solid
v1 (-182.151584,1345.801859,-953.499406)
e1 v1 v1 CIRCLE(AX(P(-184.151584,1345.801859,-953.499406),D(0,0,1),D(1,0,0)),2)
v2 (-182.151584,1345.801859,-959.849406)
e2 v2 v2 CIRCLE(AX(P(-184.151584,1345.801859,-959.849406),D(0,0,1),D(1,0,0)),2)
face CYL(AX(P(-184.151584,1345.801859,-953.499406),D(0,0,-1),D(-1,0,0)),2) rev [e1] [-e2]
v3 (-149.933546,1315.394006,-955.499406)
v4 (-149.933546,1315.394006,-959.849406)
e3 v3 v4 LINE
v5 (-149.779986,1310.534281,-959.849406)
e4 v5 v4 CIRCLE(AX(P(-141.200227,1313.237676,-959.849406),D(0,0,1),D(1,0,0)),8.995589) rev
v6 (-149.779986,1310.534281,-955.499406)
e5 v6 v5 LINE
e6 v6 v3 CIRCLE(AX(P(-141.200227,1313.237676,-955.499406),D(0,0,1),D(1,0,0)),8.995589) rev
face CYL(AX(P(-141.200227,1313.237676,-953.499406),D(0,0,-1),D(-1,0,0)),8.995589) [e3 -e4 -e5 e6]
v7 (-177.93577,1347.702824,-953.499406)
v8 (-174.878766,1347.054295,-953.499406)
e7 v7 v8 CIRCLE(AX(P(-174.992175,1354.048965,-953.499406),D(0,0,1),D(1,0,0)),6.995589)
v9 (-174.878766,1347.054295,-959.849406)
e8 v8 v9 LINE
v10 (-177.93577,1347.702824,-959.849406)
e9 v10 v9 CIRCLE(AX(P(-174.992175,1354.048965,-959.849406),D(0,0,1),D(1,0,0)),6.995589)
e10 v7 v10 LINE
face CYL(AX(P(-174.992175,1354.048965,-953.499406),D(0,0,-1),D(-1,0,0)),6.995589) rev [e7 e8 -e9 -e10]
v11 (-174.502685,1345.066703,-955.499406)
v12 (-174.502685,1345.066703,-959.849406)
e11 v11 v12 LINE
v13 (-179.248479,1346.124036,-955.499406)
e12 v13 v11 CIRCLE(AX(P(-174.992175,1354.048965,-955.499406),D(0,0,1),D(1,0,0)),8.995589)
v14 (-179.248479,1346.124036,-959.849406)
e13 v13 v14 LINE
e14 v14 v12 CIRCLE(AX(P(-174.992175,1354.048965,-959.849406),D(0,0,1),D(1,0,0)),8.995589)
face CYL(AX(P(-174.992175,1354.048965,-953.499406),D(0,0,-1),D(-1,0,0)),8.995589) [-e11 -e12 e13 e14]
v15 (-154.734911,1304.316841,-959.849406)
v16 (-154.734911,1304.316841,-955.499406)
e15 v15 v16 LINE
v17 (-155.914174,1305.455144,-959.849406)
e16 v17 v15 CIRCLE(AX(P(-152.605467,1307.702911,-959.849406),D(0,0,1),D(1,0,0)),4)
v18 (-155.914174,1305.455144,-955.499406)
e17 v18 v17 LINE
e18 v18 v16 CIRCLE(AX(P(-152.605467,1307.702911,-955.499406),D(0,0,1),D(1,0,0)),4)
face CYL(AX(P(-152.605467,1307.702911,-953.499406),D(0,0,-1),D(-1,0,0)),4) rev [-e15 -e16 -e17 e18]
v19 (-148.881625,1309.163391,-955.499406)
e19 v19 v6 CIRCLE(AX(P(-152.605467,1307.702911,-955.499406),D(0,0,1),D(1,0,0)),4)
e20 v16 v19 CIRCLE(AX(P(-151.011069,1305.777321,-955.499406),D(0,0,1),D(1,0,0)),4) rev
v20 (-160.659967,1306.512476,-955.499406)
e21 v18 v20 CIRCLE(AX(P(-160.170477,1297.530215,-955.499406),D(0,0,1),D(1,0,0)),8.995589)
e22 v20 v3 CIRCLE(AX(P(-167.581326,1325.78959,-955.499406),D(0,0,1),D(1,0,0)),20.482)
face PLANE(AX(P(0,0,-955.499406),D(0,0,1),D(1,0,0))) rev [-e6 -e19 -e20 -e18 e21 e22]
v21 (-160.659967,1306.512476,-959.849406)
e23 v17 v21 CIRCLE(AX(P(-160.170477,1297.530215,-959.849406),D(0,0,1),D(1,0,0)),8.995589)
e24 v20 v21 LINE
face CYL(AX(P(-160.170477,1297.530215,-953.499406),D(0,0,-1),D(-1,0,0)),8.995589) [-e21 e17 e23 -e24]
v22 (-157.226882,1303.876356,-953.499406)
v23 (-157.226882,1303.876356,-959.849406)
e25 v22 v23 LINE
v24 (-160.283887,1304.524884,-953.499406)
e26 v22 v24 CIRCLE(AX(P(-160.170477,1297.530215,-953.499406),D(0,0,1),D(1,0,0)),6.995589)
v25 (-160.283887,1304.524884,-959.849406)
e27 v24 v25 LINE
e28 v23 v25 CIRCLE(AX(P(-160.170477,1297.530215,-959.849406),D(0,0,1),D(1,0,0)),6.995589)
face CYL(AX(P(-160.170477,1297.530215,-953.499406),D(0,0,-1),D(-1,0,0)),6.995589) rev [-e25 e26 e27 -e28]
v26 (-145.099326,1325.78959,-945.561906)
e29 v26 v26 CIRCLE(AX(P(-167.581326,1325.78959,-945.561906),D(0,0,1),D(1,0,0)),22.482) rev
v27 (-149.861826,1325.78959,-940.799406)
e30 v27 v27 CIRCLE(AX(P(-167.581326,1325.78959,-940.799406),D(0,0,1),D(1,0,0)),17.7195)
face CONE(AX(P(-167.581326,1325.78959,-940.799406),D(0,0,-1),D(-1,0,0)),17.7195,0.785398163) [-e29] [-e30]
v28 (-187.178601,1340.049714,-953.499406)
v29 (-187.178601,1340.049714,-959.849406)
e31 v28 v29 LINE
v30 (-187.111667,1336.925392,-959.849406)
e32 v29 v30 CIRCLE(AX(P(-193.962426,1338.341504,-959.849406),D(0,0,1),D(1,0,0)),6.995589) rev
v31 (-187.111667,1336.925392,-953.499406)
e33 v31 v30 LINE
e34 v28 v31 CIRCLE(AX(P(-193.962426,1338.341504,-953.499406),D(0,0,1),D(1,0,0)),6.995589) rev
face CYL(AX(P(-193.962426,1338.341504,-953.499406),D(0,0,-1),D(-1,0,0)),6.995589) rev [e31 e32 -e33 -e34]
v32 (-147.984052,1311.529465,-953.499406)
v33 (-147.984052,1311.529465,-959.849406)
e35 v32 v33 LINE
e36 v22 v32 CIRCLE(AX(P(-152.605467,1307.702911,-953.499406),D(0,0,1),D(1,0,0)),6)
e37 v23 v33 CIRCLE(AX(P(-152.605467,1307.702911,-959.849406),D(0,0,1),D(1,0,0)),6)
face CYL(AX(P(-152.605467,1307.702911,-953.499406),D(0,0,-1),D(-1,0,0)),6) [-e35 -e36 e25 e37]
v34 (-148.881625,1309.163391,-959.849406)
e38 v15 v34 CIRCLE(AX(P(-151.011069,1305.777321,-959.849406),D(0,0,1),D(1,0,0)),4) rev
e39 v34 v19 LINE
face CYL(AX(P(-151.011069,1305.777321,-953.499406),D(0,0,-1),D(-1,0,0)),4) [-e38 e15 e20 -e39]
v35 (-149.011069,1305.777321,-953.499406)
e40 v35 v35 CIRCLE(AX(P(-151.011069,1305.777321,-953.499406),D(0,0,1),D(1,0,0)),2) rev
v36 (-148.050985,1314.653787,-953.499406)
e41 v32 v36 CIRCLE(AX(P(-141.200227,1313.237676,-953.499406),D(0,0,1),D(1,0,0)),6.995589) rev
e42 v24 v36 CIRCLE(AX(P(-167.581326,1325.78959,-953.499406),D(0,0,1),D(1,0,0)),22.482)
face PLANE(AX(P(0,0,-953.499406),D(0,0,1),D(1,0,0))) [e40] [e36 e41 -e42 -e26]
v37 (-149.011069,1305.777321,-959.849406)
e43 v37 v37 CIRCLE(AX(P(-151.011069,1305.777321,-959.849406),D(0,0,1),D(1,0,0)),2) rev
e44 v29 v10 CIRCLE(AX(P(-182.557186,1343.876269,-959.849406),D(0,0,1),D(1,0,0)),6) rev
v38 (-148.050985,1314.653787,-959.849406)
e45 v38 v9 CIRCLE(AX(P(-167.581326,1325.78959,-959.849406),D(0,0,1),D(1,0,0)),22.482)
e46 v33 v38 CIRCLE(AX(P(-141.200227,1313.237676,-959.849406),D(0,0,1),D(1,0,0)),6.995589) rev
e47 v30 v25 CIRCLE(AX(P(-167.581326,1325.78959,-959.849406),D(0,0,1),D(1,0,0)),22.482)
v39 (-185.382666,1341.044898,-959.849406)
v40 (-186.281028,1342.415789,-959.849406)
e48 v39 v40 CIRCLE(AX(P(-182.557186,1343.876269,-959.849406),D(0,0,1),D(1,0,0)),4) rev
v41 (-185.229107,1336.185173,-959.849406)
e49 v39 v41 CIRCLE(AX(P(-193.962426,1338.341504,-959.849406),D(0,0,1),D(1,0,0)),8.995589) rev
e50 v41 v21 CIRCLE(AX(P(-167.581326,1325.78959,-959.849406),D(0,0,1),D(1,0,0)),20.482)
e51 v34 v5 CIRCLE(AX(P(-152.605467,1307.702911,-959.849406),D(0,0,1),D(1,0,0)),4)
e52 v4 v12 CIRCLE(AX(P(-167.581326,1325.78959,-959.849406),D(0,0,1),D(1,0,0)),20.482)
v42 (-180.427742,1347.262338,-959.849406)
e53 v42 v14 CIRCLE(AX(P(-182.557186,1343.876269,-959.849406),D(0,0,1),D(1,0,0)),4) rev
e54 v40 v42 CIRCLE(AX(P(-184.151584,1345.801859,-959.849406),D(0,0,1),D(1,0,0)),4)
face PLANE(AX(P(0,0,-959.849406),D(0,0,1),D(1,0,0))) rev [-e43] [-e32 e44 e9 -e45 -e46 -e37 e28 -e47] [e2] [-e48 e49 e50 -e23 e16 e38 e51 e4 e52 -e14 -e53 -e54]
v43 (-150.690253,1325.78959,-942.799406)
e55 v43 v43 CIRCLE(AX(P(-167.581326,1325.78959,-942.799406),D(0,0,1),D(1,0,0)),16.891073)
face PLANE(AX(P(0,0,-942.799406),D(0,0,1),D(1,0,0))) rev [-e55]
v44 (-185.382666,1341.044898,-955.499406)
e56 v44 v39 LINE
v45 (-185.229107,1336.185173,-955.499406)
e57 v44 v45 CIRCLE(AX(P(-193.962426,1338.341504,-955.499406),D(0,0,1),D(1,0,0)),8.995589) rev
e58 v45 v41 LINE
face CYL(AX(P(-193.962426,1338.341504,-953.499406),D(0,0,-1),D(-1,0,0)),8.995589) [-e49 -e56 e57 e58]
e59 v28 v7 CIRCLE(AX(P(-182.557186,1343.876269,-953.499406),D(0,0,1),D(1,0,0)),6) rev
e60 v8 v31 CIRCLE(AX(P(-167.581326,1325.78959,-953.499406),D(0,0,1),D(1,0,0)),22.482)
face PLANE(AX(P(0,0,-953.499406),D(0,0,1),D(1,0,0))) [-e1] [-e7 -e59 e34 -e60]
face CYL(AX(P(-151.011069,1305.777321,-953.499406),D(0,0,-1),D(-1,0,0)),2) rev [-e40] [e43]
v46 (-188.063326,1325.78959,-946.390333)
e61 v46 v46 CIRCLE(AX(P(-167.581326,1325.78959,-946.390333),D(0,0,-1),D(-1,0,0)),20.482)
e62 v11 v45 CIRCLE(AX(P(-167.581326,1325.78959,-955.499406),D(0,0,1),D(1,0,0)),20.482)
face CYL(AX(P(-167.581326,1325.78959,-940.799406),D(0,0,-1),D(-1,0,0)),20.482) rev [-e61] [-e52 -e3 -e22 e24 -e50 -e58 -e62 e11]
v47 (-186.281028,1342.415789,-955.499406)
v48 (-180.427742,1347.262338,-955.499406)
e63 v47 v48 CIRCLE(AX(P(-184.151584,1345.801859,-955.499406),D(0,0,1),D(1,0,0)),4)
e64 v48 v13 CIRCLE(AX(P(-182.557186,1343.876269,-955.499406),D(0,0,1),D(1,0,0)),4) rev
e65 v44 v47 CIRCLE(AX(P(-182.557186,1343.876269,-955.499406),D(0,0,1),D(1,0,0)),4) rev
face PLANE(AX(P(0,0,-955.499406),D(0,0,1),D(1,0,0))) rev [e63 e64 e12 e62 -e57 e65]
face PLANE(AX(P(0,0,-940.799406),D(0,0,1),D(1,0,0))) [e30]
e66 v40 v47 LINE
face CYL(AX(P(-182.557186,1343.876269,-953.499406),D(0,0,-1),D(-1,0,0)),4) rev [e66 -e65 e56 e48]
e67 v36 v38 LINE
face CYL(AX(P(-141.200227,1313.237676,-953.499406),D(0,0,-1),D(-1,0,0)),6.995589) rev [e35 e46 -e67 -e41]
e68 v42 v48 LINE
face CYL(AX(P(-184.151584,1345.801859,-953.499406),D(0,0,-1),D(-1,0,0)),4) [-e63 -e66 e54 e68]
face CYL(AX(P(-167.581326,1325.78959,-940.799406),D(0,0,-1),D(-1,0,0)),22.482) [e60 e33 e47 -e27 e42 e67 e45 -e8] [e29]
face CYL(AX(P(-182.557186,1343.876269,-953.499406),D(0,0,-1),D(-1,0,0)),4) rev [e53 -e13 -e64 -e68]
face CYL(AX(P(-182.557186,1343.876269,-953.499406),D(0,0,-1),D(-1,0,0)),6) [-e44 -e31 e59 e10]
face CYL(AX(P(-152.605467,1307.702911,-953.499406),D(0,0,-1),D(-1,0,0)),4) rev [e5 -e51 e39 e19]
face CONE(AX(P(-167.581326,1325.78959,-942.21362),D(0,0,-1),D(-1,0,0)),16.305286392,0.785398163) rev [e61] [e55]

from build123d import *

# Parameters (mm, degrees)
SKETCH1_R           = 22.482
SKETCH1_R_2         = 19.45
SKETCH1_R_3         = 5
SKETCH1_R_4         = 2.8
BOSS_EXTRUDE1_DEPTH = 19.05
SKETCH1_5_R         = 2
BOSS_EXTRUDE3_DEPTH = 6.35
CHAMFER1_SIZE       = 4.7625
SHELL1_START        = -959.849406281
SHELL1_OUTLINE_R    = 20.481999936
SHELL1_DEPTH        = 13.459072749
SHELL1_2_DEPTH      = 4.349999936


with BuildPart() as part:
    # Sketch1 → Boss-Extrude1 (new body)
    # profile 1 of 6: a face of its own
    with BuildSketch(Plane.XY.offset(-959.849406281)):
        with Locations(Location((-167.581326331, 1325.789589838, 0), (0, 0, 180))):
            Circle(SKETCH1_R)
        with Locations((-167.581326331, 1325.789589838)):
            Circle(SKETCH1_R_2, mode=Mode.SUBTRACT)
    # profile 2 of 6: a face of its own
    with BuildSketch(Plane.XY.offset(-959.849406281)):
        with Locations((-167.581326331, 1325.789589838)):
            Circle(SKETCH1_R_2)
        with Locations((-158.719406684, 1324.967166478)):
            Circle(SKETCH1_R_3, mode=Mode.SUBTRACT)
        with Locations((-176.443245977, 1326.612013197)):
            Circle(SKETCH1_R_3, mode=Mode.SUBTRACT)
        with Locations((-168.704072827, 1313.691575939)):
            Circle(SKETCH1_R_4, mode=Mode.SUBTRACT)
        Polygon((-169.416951474, 1318.076211503), (-167.966159705, 1333.709036048), (-165.745701187, 1333.502968172), (-167.196492956, 1317.870143628), align=None, mode=Mode.SUBTRACT)
    # profile 3 of 6: a face of its own
    with BuildSketch(Plane.XY.offset(-959.849406281)):
        with Locations((-168.704072827, 1313.691575939)):
            Circle(SKETCH1_R_4)
    # profile 4 of 6: a face of its own
    with BuildSketch(Plane.XY.offset(-959.849406281)):
        with Locations((-158.719406684, 1324.967166478)):
            Circle(SKETCH1_R_3)
    # profile 5 of 6: a face of its own
    with BuildSketch(Plane.XY.offset(-959.849406281)):
        Polygon((-167.966159705, 1333.709036048), (-165.745701187, 1333.502968172), (-167.196492956, 1317.870143628), (-169.416951474, 1318.076211503), align=None)
    # profile 6 of 6: a face of its own
    with BuildSketch(Plane.XY.offset(-959.849406281)):
        with Locations((-176.443245977, 1326.612013197)):
            Circle(SKETCH1_R_3)
    extrude(amount=BOSS_EXTRUDE1_DEPTH)

    # Sketch1<5> → Boss-Extrude3 (add)
    # profile 1 of 2: a face of its own
    with BuildSketch(Plane.XY.offset(-959.849406281)):
        with BuildLine():
            ThreePointArc((-187.111667422, 1336.925392497), (-181.91942666, 1343.106032976), (-174.878765823, 1347.054295358))
            ThreePointArc((-174.878765823, 1347.054295358), (-176.443944893, 1347.205674138), (-177.935770468, 1347.702823524))
            ThreePointArc((-177.935770468, 1347.702823524), (-186.383740435, 1348.497684162), (-187.178601073, 1340.049714195))
            ThreePointArc((-187.178601073, 1340.049714195), (-186.968441908, 1338.4913387), (-187.111667422, 1336.925392497))
        make_face()
        with Locations((-184.151583548, 1345.801858569)):
            Circle(SKETCH1_5_R, mode=Mode.SUBTRACT)
    # profile 2 of 2: a face of its own
    with BuildSketch(Plane.XY.offset(-959.849406281)):
        with BuildLine():
            ThreePointArc((-147.984051588, 1311.529465481), (-148.194210754, 1313.087840976), (-148.050985239, 1314.653787179))
            ThreePointArc((-148.050985239, 1314.653787179), (-153.243226001, 1308.4731467), (-160.283886838, 1304.524884318))
            ThreePointArc((-160.283886838, 1304.524884318), (-158.718707768, 1304.373505537), (-157.226882193, 1303.876356151))
            ThreePointArc((-157.226882193, 1303.876356151), (-148.778912226, 1303.081495514), (-147.984051588, 1311.529465481))
        make_face()
        with Locations((-151.011069114, 1305.777321107)):
            Circle(SKETCH1_5_R, mode=Mode.SUBTRACT)
    extrude(amount=BOSS_EXTRUDE3_DEPTH)

    # Chamfer1
    chamfer1_edges = [part.edges().sort_by_distance(p)[0] for p in [
        (-145.099326331, 1325.789589838, -940.799406281),
    ]]
    chamfer(chamfer1_edges, length=CHAMFER1_SIZE)

    # Shell1: read off the stored shape, not the designer's step
    # Shell1 outline → Shell1 (cut)
    with BuildSketch(Plane.XY.offset(SHELL1_START)):
        with Locations((-167.581326331, 1325.789589838)):
            Circle(SHELL1_OUTLINE_R)
    extrude(amount=SHELL1_DEPTH, mode=Mode.SUBTRACT)

    # Shell1 2 outline → Shell1 2 (cut)
    with BuildSketch(Plane.XY.offset(SHELL1_START)):
        with BuildLine():
            ThreePointArc((-179.248478566, 1346.124035779), (-179.779181822, 1346.754235772), (-180.427741548, 1347.262338379))
            ThreePointArc((-180.427741548, 1347.262338379), (-181.600547064, 1342.720914984), (-186.281027509, 1342.415788733))
            ThreePointArc((-186.281027509, 1342.415788733), (-185.902815813, 1341.683836624), (-185.382666181, 1341.044898178))
            ThreePointArc((-185.382666181, 1341.044898178), (-184.97132452, 1338.625607411), (-185.229107011, 1336.185173441))
            ThreePointArc((-185.229107011, 1336.185173441), (-180.643908398, 1341.565561159), (-174.502685337, 1345.066703493))
            ThreePointArc((-174.502685337, 1345.066703493), (-176.948372758, 1345.268651042), (-179.248478566, 1346.124035779))
        make_face()
        with BuildLine():
            ThreePointArc((-149.77998648, 1310.534281498), (-150.191328141, 1312.953572265), (-149.93354565, 1315.394006235))
            ThreePointArc((-149.93354565, 1315.394006235), (-154.518744264, 1310.013618517), (-160.659967324, 1306.512476183))
            ThreePointArc((-160.659967324, 1306.512476183), (-158.214279903, 1306.310528634), (-155.914174095, 1305.455143896))
            ThreePointArc((-155.914174095, 1305.455143896), (-155.383470839, 1304.824943903), (-154.734911113, 1304.316841296))
            ThreePointArc((-154.734911113, 1304.316841296), (-153.562105598, 1308.858264691), (-148.881625153, 1309.163390942))
            ThreePointArc((-148.881625153, 1309.163390942), (-149.259836848, 1309.895343052), (-149.77998648, 1310.534281498))
        make_face()
    extrude(amount=SHELL1_2_DEPTH, mode=Mode.SUBTRACT)

    # Shell1 3 outline → Shell1 3 (revolve, cut)
    with BuildSketch(Plane(origin=(-167.581326331, 1325.789589838, 0), x_dir=(1, 0, 0), z_dir=(0, -1, 0))):
        Polygon((16.891072849, -942.799406345), (0, -942.799406345), (0, -946.390333532), (20.481999936, -946.390333532), align=None)
    revolve(axis=Axis((-167.581326331, 1325.789589838, 0), (0, 0, 1)), mode=Mode.SUBTRACT)


solid = part.part
